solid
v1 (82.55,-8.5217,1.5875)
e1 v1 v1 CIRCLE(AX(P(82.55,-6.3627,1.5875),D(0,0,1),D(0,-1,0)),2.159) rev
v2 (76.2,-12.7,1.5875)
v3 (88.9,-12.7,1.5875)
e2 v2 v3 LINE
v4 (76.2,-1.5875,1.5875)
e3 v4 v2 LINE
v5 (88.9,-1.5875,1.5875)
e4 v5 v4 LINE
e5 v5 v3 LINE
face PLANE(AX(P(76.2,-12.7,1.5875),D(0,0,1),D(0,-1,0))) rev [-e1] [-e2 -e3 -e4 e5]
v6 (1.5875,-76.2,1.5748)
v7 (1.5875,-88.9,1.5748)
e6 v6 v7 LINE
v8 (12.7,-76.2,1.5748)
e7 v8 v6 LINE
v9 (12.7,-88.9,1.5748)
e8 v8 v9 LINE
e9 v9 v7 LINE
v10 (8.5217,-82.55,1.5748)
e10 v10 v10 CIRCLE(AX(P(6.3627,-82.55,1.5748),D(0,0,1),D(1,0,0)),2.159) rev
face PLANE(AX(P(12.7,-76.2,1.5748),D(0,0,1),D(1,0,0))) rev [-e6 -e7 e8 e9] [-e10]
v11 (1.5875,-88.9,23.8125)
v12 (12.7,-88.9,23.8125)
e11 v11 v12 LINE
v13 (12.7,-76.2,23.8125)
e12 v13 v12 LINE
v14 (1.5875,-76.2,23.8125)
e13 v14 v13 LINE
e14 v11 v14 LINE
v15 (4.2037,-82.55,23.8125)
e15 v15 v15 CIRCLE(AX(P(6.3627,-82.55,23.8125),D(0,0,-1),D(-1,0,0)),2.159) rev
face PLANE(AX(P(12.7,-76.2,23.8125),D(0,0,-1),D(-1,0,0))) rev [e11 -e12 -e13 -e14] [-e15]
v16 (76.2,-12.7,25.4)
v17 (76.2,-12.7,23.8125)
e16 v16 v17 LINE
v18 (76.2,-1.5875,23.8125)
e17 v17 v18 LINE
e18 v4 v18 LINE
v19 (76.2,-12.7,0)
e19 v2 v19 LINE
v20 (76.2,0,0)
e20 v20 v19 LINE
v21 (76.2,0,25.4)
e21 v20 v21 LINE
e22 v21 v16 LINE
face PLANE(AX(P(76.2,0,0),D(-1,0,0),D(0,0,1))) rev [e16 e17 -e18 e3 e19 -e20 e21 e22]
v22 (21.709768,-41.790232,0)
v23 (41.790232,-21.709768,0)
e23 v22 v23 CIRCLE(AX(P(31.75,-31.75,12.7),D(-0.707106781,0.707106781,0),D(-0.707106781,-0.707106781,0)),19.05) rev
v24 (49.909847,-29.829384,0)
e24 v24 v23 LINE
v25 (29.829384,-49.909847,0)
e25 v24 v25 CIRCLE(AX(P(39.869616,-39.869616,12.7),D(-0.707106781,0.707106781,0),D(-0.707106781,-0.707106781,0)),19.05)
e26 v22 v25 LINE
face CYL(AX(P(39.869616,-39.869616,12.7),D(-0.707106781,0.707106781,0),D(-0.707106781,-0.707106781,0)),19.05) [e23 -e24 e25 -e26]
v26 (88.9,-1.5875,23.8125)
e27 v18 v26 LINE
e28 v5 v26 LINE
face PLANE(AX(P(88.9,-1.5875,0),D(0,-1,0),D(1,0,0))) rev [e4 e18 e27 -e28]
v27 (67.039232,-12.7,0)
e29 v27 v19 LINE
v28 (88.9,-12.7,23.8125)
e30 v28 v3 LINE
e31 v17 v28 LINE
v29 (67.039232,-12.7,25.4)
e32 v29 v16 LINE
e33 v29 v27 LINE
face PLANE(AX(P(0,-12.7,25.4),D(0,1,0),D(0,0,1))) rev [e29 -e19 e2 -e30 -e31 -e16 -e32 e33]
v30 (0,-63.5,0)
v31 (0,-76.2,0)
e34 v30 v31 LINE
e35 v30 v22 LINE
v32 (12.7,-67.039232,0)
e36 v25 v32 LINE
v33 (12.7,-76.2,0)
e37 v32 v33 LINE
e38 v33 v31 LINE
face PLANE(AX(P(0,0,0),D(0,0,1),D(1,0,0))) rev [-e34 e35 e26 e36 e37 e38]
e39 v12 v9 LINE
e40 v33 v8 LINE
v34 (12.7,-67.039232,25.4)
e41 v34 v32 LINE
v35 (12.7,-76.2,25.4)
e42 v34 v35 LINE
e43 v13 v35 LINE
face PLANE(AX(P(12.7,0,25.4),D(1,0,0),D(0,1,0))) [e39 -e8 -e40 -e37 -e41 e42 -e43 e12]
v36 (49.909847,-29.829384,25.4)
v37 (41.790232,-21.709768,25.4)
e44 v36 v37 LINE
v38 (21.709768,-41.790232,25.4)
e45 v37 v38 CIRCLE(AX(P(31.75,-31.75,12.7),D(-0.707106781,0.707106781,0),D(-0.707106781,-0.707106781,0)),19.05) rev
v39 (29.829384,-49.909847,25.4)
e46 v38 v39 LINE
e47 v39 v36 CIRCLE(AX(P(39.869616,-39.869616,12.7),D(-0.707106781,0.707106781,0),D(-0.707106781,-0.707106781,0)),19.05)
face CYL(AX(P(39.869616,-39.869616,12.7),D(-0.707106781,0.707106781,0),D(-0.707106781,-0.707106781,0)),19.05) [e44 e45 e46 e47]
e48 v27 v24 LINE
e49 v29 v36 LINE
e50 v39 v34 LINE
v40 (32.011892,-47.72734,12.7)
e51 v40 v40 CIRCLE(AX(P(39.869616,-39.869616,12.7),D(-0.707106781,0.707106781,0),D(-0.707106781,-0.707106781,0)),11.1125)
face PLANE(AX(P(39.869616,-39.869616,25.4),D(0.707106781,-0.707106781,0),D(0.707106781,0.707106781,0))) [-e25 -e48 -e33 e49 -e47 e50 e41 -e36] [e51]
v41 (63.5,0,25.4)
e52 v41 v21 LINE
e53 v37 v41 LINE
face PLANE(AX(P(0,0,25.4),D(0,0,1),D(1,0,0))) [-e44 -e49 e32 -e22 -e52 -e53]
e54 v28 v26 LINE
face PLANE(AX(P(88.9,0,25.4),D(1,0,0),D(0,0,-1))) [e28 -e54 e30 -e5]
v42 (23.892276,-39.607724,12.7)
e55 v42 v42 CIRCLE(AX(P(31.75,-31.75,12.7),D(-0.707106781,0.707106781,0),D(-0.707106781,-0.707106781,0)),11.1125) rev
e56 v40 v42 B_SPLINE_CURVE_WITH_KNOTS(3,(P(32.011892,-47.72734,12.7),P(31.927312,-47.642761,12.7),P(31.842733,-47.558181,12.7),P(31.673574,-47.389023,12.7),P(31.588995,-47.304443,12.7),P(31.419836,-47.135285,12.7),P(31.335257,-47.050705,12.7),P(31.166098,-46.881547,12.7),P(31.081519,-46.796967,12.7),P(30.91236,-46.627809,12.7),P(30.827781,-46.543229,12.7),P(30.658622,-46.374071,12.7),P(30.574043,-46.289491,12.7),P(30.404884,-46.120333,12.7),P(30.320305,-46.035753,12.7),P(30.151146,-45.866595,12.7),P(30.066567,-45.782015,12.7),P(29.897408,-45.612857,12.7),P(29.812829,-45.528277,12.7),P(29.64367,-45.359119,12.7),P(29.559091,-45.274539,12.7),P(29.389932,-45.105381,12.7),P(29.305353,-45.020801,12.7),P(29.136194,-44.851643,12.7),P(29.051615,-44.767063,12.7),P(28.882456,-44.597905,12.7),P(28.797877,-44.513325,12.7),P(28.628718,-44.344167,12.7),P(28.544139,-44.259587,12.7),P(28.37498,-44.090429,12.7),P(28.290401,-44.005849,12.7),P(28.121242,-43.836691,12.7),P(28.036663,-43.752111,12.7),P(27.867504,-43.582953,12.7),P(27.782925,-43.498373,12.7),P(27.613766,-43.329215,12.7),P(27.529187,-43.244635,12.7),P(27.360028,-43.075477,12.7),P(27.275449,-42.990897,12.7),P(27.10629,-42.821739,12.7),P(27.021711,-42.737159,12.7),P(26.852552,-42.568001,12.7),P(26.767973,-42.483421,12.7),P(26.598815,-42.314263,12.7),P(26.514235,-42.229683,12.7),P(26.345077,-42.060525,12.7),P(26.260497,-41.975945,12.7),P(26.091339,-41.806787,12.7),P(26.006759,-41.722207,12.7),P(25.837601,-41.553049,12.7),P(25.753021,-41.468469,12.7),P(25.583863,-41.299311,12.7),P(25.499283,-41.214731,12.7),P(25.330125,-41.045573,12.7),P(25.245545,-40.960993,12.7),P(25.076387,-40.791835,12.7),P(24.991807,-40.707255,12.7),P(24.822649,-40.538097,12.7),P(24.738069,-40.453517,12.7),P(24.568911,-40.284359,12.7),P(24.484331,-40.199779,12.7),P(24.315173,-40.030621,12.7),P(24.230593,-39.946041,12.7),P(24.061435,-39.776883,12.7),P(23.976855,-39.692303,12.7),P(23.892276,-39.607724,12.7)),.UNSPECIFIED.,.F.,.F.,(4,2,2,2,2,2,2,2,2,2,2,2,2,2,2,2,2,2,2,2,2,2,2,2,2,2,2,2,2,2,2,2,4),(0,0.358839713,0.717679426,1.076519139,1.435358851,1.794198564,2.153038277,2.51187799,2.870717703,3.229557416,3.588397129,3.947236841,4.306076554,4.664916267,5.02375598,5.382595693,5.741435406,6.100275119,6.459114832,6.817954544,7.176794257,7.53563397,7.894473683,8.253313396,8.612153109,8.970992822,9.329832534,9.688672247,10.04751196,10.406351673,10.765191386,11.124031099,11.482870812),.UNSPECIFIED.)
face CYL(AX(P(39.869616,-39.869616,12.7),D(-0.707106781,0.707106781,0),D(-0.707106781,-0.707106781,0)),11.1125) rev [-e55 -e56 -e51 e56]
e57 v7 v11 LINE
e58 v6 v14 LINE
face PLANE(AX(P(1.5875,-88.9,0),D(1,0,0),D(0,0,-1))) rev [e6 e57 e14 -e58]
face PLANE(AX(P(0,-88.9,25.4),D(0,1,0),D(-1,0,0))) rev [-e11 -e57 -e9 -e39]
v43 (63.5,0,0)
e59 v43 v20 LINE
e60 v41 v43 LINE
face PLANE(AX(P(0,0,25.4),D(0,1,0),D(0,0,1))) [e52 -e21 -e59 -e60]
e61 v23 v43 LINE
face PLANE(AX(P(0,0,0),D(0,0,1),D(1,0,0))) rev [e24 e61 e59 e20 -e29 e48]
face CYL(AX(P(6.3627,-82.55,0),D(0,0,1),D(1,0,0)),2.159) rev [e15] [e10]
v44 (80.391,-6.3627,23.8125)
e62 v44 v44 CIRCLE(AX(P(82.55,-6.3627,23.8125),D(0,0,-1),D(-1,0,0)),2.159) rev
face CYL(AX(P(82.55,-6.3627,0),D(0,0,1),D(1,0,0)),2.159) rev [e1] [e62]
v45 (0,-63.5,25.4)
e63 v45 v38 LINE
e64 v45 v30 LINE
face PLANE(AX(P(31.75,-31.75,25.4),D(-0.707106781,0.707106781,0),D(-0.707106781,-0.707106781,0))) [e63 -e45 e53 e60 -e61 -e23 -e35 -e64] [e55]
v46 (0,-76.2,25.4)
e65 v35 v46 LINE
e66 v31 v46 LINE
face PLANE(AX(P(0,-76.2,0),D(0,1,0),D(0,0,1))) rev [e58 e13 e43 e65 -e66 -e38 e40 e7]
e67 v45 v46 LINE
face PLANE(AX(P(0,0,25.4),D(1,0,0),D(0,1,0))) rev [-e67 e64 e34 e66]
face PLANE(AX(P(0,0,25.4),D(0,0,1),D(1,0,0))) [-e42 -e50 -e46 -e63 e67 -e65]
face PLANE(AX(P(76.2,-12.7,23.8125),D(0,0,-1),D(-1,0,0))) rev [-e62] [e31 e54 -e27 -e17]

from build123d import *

# Parameters (mm, degrees)
BOSS_EXTRUDE1_DEPTH    = 25.4
SKETCH2_R              = 2.159
SKETCH2_W              = 12.7
SKETCH2_H              = 1.5875
SKETCH2_W_2            = 1.5875
SKETCH2_H_2            = 12.7
CUT_EXTRUDE1_DEPTH     = 25.4
SKETCH3_W              = 12.7
SKETCH3_H              = 1.5875
SKETCH3_H_2            = 1.5748
CUT_EXTRUDE2_DEPTH     = 12.7
SKETCH4_W              = 1.5875
SKETCH4_H              = 12.7
CUT_EXTRUDE3_DEPTH     = 12.7
F_3DSKETCH1_R          = 19.05
F_3DSKETCH1_R_2        = 11.1125
BOSS_EXTRUDE2_DEPTH    = 11.482870812
CUT_EXTRUDE4_START     = 44.901280605
CUT_EXTRUDE4_OUTLINE_R = 11.1125
CUT_EXTRUDE4_DEPTH     = 11.482870812


# Read off the part's stored shape, not the designer's step: Cut-Extrude4
with BuildPart() as part:
    # Sketch1 → Boss-Extrude1 (new body)
    with BuildSketch(Plane.XY):
        Polygon((88.9, 0), (63.5, 0), (0, -63.5), (0, -88.9), (12.7, -88.9), (12.7, -67.039231637), (67.039231637, -12.7), (88.9, -12.7), align=None)
    extrude(amount=BOSS_EXTRUDE1_DEPTH)

    # Sketch2 → Cut-Extrude1 (cut)
    with BuildSketch(Plane.XY.offset(25.4)):
        with Locations((82.55, -6.3627)):
            Circle(SKETCH2_R)
        with Locations((6.3627, -82.55)):
            Circle(SKETCH2_R)
        with Locations((82.55, -0.79375)):
            Rectangle(SKETCH2_W, SKETCH2_H)
        with Locations((0.79375, -82.55)):
            Rectangle(SKETCH2_W_2, SKETCH2_H_2)
    extrude(amount=-CUT_EXTRUDE1_DEPTH, mode=Mode.SUBTRACT)

    # Sketch3 → Cut-Extrude2 (cut)
    with BuildSketch(Plane.XZ.offset(88.9)):
        with Locations((6.35, 24.60625)):
            Rectangle(SKETCH3_W, SKETCH3_H)
        with Locations((6.35, 0.7874)):
            Rectangle(SKETCH3_W, SKETCH3_H_2)
    extrude(amount=-CUT_EXTRUDE2_DEPTH, mode=Mode.SUBTRACT)

    # Sketch4 → Cut-Extrude3 (cut)
    with BuildSketch(Plane(origin=(88.9, 0, 0), x_dir=(0, 0, -1), z_dir=(1, 0, 0))):
        with Locations((-0.79375, -6.35)):
            Rectangle(SKETCH4_W, SKETCH4_H)
        with Locations((-24.60625, -6.35)):
            Rectangle(SKETCH4_W, SKETCH4_H)
    extrude(amount=-CUT_EXTRUDE3_DEPTH, mode=Mode.SUBTRACT)

    # 3DSketch1 → Boss-Extrude2 (add)
    with BuildSketch(Plane(origin=(67.039231637, -12.7, 0), x_dir=(-0.6713837490692134, -0.6713837490692195, 0.3138275369873187), z_dir=(0.7071067811865508, -0.7071067811865444, 0))):
        with Locations((40.468086778, 0)):
            Circle(F_3DSKETCH1_R)
        with Locations((40.468086778, 0)):
            Circle(F_3DSKETCH1_R_2, mode=Mode.SUBTRACT)
    extrude(amount=-BOSS_EXTRUDE2_DEPTH)

    # Cut-Extrude4 outline → Cut-Extrude4 (cut)
    with BuildSketch(Plane(origin=(0, 0, 0), x_dir=(0.7071067811865438, 0.7071067811865512, 0), z_dir=(0.7071067811865511, -0.7071067811865441, 0)).offset(CUT_EXTRUDE4_START)):
        with Locations((0, 12.7)):
            Circle(CUT_EXTRUDE4_OUTLINE_R)
    extrude(amount=CUT_EXTRUDE4_DEPTH, mode=Mode.SUBTRACT)


solid = part.part
